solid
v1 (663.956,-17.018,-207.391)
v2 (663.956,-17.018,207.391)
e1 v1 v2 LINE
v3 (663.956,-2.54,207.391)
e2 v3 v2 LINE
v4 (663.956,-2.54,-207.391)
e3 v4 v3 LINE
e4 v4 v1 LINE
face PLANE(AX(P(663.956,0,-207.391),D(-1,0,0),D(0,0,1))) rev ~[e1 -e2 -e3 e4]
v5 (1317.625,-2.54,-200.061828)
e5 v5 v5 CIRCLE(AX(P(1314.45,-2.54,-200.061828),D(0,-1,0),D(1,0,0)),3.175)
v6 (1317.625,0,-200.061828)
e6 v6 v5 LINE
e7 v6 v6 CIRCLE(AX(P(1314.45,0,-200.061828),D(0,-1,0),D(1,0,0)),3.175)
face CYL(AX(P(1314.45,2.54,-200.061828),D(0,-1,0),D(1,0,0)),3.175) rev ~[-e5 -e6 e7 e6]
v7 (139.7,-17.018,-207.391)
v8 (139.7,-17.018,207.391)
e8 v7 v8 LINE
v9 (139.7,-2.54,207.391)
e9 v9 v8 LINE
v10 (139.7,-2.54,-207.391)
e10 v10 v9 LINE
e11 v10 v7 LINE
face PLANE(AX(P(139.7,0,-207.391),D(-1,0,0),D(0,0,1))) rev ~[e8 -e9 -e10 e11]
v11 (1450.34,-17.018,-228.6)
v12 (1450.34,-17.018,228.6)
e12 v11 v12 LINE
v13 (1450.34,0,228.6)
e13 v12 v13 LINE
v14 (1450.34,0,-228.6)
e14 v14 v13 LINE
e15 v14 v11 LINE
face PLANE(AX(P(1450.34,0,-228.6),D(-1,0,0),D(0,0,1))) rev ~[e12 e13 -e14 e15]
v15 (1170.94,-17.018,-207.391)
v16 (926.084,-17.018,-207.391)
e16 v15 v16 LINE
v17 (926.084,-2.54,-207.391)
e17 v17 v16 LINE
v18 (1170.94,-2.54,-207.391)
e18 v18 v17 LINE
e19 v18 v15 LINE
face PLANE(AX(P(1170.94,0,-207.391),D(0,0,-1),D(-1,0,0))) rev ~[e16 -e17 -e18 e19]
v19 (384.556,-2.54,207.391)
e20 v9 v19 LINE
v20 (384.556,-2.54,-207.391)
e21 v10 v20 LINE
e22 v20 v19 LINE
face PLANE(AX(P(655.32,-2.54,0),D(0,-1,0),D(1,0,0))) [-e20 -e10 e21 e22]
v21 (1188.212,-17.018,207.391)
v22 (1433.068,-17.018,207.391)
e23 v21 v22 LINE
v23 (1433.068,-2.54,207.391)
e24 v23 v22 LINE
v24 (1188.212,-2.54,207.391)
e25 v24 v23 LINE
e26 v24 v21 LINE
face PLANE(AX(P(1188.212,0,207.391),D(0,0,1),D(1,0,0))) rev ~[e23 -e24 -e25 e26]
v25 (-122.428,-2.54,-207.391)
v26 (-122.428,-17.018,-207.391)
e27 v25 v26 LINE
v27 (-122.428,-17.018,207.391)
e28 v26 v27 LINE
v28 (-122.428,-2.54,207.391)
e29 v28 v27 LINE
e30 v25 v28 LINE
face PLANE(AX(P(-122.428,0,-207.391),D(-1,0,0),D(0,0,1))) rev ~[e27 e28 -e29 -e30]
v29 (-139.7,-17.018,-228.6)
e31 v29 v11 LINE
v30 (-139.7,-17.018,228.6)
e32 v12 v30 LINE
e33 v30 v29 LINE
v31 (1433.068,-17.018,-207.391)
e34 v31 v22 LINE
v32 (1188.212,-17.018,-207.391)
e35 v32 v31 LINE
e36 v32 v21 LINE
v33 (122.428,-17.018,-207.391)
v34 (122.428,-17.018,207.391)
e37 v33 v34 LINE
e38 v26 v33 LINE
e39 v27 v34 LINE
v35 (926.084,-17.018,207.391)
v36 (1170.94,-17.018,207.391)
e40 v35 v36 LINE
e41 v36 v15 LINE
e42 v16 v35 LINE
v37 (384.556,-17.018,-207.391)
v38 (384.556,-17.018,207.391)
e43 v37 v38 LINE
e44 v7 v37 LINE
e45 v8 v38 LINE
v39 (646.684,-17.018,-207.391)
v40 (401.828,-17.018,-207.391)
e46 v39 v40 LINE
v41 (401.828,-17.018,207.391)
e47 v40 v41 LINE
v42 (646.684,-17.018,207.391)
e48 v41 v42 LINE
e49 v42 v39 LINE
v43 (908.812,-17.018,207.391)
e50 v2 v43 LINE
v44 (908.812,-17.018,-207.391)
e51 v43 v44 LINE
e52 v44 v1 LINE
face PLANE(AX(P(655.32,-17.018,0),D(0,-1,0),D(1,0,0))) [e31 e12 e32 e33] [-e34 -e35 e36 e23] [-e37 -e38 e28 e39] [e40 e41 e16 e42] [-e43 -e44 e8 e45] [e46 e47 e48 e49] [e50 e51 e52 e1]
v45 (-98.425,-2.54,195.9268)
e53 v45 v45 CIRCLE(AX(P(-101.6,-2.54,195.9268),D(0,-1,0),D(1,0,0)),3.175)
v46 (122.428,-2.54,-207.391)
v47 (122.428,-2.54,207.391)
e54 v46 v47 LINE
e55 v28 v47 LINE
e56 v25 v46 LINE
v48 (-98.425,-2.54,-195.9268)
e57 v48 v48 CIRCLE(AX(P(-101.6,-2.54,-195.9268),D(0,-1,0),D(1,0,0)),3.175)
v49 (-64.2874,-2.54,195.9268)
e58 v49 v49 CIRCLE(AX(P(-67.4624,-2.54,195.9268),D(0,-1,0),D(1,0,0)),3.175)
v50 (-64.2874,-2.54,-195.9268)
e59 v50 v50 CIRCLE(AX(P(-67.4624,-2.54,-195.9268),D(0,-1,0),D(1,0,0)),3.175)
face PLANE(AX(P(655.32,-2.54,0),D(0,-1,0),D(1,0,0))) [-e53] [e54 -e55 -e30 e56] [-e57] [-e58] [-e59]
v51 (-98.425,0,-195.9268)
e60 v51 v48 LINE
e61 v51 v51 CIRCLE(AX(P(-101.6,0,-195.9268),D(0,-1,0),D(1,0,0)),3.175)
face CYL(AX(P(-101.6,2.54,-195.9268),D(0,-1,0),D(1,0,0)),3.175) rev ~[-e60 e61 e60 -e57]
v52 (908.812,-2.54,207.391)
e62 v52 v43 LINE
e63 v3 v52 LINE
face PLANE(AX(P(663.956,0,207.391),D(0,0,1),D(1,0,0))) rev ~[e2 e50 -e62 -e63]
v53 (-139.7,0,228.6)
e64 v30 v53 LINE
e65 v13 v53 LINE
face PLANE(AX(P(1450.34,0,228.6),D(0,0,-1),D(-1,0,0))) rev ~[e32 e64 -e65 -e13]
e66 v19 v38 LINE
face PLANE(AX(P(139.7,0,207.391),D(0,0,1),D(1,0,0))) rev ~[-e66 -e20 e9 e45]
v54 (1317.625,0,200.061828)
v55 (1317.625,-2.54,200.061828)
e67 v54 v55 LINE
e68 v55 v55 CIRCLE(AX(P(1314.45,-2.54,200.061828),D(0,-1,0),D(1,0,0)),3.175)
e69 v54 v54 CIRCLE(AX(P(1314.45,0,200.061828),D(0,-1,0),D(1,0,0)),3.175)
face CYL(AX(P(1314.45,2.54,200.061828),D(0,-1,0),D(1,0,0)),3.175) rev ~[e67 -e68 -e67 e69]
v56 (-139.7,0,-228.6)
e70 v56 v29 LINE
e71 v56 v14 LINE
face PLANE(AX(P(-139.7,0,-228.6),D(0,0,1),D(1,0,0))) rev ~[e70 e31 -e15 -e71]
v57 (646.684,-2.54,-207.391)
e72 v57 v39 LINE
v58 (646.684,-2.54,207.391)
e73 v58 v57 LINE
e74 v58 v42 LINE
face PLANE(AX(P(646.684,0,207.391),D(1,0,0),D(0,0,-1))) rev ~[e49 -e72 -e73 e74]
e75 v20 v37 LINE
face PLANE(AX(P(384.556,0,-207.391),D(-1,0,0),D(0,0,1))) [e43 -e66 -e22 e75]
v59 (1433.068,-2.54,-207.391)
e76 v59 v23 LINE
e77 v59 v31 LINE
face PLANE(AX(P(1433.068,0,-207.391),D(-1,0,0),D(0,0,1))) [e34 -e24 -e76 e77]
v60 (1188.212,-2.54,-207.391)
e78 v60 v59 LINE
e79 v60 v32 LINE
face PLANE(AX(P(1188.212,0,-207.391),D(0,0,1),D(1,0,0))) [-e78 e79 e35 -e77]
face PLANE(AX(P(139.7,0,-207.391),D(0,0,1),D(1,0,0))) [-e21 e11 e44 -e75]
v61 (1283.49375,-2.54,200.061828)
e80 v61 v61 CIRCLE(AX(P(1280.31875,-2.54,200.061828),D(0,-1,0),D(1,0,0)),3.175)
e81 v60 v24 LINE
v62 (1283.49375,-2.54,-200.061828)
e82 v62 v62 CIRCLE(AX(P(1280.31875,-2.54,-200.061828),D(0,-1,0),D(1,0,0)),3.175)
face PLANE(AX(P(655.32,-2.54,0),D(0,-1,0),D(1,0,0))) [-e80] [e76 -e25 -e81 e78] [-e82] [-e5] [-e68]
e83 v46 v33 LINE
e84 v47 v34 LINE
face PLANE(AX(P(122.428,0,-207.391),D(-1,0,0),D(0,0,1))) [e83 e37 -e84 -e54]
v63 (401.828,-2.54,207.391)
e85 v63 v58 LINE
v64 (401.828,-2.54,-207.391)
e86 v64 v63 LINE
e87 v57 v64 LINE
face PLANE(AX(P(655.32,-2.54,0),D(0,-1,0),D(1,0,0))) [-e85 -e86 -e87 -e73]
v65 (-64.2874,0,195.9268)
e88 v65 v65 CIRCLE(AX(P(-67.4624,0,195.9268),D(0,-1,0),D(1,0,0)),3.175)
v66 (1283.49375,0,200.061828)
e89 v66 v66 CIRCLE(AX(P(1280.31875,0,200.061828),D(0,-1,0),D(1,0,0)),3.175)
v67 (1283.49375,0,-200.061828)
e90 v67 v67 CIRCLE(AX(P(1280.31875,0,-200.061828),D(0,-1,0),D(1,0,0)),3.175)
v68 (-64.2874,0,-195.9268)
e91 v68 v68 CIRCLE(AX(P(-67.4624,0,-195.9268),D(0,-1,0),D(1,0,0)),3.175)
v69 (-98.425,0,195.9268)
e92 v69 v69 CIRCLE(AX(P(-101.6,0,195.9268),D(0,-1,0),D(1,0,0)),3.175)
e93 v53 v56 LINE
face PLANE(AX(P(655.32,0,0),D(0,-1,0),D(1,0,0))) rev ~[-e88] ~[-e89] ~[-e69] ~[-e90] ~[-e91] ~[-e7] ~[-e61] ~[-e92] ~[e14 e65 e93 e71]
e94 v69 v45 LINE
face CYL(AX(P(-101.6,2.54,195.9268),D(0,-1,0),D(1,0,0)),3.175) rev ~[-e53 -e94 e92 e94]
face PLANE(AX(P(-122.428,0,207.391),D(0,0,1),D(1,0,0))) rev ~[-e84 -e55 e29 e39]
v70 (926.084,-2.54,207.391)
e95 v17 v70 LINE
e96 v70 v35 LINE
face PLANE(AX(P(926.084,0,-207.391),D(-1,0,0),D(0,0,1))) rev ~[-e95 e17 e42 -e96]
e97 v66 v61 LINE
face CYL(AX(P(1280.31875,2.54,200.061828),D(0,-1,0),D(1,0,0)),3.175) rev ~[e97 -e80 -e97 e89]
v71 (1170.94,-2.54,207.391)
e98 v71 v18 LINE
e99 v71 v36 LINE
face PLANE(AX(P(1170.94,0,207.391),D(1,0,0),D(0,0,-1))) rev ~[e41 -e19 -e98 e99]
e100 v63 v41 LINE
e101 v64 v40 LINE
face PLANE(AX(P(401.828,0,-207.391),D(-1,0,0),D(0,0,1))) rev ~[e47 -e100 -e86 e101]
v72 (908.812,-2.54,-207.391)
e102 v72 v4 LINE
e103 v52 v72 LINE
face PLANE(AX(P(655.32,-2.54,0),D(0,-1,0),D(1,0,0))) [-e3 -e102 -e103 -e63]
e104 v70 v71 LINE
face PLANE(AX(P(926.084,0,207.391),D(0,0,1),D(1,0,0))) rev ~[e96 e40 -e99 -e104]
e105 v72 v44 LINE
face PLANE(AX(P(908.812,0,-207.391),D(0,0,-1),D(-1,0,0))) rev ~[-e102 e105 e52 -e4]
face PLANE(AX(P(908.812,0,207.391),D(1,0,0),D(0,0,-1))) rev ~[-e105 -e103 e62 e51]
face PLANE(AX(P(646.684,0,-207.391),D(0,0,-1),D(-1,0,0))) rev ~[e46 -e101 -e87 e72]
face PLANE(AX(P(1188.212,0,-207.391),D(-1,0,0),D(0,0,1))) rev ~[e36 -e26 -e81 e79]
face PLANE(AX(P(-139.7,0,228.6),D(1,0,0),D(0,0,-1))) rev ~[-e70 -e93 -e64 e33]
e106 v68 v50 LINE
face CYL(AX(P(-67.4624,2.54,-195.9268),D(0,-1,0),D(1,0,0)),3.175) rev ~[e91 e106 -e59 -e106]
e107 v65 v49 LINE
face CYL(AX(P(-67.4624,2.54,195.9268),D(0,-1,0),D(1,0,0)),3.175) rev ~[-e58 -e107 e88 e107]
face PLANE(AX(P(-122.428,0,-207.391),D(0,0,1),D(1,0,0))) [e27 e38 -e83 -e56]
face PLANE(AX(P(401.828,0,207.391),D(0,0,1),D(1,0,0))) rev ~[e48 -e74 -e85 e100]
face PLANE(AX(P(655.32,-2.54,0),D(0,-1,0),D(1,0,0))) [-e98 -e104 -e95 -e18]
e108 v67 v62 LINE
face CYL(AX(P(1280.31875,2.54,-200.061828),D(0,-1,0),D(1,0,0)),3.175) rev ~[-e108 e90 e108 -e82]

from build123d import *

# Parameters (mm, degrees)
F0_W     = 244.856
F0_H     = 414.782
F1_DEPTH = 17.018
F2_DEPTH = 2.54
F4_D     = 6.35
F4_DEPTH = 2.54
F4_TIP   = 1.9077324654


# Not quite as in the source:
# - a feature names something its author has since deleted; it is built from what else it names


with BuildPart() as f1:
    # F0 (on Front) → F1 (new body)
    with BuildSketch(Plane.XZ):
        Polygon((350.52, 228.6), (139.7, 228.6), (105.41, 228.6), (-139.7, 228.6), (-139.7, -228.6), (105.41, -228.6), (139.7, -228.6), (350.52, -228.6), (384.81, -228.6), (595.63, -228.6), (629.92, -228.6), (840.74, -228.6), (875.03, -228.6), (1085.85, -228.6), (1120.14, -228.6), (1365.25, -228.6), (1450.34, -228.6), (1450.34, 228.6), (1365.25, 228.6), (1120.14, 228.6), (1085.85, 228.6), (875.03, 228.6), (840.74, 228.6), (629.92, 228.6), (595.63, 228.6), (384.81, 228.6), align=None)
        Rectangle(F0_W, F0_H, mode=Mode.SUBTRACT)
        with Locations((262.128, 0)):
            Rectangle(F0_W, F0_H, mode=Mode.SUBTRACT)
        Polygon((629.92, 207.391), (646.684, 207.391), (646.684, -207.391), (629.92, -207.391), (401.828, -207.391), (401.828, 207.391), align=None, mode=Mode.SUBTRACT)
        Polygon((875.03, 207.391), (908.812, 207.391), (908.812, -207.391), (875.03, -207.391), (663.956, -207.391), (663.956, 207.391), align=None, mode=Mode.SUBTRACT)
        Polygon((1120.14, 207.391), (1170.94, 207.391), (1170.94, -207.391), (1120.14, -207.391), (926.084, -207.391), (926.084, 207.391), align=None, mode=Mode.SUBTRACT)
        with Locations((1310.64, 0)):
            Rectangle(F0_W, F0_H, mode=Mode.SUBTRACT)
    extrude(amount=F1_DEPTH)

    # F0 (on Front) → F2 (join)
    with BuildSketch(Plane.XZ):
        Polygon((350.52, 228.6), (139.7, 228.6), (105.41, 228.6), (-139.7, 228.6), (-139.7, -228.6), (105.41, -228.6), (139.7, -228.6), (350.52, -228.6), (384.81, -228.6), (595.63, -228.6), (629.92, -228.6), (840.74, -228.6), (875.03, -228.6), (1085.85, -228.6), (1120.14, -228.6), (1365.25, -228.6), (1450.34, -228.6), (1450.34, 228.6), (1365.25, 228.6), (1120.14, 228.6), (1085.85, 228.6), (875.03, 228.6), (840.74, 228.6), (629.92, 228.6), (595.63, 228.6), (384.81, 228.6), align=None)
        Rectangle(F0_W, F0_H, mode=Mode.SUBTRACT)
        with Locations((262.128, 0)):
            Rectangle(F0_W, F0_H, mode=Mode.SUBTRACT)
        Polygon((629.92, 207.391), (646.684, 207.391), (646.684, -207.391), (629.92, -207.391), (401.828, -207.391), (401.828, 207.391), align=None, mode=Mode.SUBTRACT)
        Polygon((875.03, 207.391), (908.812, 207.391), (908.812, -207.391), (875.03, -207.391), (663.956, -207.391), (663.956, 207.391), align=None, mode=Mode.SUBTRACT)
        Polygon((1120.14, 207.391), (1170.94, 207.391), (1170.94, -207.391), (1120.14, -207.391), (926.084, -207.391), (926.084, 207.391), align=None, mode=Mode.SUBTRACT)
        with Locations((1310.64, 0)):
            Rectangle(F0_W, F0_H, mode=Mode.SUBTRACT)
        Rectangle(F0_W, F0_H)
        with Locations((262.128, 0)):
            Rectangle(F0_W, F0_H)
        Polygon((646.684, -207.391), (646.684, 207.391), (629.92, 207.391), (401.828, 207.391), (401.828, -207.391), (629.92, -207.391), align=None)
        Polygon((908.812, -207.391), (908.812, 207.391), (875.03, 207.391), (663.956, 207.391), (663.956, -207.391), (875.03, -207.391), align=None)
        Polygon((1170.94, -207.391), (1170.94, 207.391), (1120.14, 207.391), (926.084, 207.391), (926.084, -207.391), (1120.14, -207.391), align=None)
        with Locations((1310.64, 0)):
            Rectangle(F0_W, F0_H)
    extrude(amount=F2_DEPTH)

    # F4
    with Locations(Plane(origin=(0, 0, 0), x_dir=(-1, 0, 0), z_dir=(0, 1, 0))):
        with Locations((-1314.45, 200.061827898), (-1280.31875, 200.061827898), (67.4624, 195.9268003702), (101.6, 195.9268003702), (-1314.45, -200.061827898), (-1280.31875, -200.061827898), (67.4624, -195.9268003702), (101.6, -195.9268003702)):
            Hole(F4_D / 2, depth=F4_DEPTH)
            with Locations((0, 0, -(F4_DEPTH + F4_TIP / 2))):  # 118° drill point
                Cone(0, F4_D / 2, F4_TIP, mode=Mode.SUBTRACT)


solid = f1.part
